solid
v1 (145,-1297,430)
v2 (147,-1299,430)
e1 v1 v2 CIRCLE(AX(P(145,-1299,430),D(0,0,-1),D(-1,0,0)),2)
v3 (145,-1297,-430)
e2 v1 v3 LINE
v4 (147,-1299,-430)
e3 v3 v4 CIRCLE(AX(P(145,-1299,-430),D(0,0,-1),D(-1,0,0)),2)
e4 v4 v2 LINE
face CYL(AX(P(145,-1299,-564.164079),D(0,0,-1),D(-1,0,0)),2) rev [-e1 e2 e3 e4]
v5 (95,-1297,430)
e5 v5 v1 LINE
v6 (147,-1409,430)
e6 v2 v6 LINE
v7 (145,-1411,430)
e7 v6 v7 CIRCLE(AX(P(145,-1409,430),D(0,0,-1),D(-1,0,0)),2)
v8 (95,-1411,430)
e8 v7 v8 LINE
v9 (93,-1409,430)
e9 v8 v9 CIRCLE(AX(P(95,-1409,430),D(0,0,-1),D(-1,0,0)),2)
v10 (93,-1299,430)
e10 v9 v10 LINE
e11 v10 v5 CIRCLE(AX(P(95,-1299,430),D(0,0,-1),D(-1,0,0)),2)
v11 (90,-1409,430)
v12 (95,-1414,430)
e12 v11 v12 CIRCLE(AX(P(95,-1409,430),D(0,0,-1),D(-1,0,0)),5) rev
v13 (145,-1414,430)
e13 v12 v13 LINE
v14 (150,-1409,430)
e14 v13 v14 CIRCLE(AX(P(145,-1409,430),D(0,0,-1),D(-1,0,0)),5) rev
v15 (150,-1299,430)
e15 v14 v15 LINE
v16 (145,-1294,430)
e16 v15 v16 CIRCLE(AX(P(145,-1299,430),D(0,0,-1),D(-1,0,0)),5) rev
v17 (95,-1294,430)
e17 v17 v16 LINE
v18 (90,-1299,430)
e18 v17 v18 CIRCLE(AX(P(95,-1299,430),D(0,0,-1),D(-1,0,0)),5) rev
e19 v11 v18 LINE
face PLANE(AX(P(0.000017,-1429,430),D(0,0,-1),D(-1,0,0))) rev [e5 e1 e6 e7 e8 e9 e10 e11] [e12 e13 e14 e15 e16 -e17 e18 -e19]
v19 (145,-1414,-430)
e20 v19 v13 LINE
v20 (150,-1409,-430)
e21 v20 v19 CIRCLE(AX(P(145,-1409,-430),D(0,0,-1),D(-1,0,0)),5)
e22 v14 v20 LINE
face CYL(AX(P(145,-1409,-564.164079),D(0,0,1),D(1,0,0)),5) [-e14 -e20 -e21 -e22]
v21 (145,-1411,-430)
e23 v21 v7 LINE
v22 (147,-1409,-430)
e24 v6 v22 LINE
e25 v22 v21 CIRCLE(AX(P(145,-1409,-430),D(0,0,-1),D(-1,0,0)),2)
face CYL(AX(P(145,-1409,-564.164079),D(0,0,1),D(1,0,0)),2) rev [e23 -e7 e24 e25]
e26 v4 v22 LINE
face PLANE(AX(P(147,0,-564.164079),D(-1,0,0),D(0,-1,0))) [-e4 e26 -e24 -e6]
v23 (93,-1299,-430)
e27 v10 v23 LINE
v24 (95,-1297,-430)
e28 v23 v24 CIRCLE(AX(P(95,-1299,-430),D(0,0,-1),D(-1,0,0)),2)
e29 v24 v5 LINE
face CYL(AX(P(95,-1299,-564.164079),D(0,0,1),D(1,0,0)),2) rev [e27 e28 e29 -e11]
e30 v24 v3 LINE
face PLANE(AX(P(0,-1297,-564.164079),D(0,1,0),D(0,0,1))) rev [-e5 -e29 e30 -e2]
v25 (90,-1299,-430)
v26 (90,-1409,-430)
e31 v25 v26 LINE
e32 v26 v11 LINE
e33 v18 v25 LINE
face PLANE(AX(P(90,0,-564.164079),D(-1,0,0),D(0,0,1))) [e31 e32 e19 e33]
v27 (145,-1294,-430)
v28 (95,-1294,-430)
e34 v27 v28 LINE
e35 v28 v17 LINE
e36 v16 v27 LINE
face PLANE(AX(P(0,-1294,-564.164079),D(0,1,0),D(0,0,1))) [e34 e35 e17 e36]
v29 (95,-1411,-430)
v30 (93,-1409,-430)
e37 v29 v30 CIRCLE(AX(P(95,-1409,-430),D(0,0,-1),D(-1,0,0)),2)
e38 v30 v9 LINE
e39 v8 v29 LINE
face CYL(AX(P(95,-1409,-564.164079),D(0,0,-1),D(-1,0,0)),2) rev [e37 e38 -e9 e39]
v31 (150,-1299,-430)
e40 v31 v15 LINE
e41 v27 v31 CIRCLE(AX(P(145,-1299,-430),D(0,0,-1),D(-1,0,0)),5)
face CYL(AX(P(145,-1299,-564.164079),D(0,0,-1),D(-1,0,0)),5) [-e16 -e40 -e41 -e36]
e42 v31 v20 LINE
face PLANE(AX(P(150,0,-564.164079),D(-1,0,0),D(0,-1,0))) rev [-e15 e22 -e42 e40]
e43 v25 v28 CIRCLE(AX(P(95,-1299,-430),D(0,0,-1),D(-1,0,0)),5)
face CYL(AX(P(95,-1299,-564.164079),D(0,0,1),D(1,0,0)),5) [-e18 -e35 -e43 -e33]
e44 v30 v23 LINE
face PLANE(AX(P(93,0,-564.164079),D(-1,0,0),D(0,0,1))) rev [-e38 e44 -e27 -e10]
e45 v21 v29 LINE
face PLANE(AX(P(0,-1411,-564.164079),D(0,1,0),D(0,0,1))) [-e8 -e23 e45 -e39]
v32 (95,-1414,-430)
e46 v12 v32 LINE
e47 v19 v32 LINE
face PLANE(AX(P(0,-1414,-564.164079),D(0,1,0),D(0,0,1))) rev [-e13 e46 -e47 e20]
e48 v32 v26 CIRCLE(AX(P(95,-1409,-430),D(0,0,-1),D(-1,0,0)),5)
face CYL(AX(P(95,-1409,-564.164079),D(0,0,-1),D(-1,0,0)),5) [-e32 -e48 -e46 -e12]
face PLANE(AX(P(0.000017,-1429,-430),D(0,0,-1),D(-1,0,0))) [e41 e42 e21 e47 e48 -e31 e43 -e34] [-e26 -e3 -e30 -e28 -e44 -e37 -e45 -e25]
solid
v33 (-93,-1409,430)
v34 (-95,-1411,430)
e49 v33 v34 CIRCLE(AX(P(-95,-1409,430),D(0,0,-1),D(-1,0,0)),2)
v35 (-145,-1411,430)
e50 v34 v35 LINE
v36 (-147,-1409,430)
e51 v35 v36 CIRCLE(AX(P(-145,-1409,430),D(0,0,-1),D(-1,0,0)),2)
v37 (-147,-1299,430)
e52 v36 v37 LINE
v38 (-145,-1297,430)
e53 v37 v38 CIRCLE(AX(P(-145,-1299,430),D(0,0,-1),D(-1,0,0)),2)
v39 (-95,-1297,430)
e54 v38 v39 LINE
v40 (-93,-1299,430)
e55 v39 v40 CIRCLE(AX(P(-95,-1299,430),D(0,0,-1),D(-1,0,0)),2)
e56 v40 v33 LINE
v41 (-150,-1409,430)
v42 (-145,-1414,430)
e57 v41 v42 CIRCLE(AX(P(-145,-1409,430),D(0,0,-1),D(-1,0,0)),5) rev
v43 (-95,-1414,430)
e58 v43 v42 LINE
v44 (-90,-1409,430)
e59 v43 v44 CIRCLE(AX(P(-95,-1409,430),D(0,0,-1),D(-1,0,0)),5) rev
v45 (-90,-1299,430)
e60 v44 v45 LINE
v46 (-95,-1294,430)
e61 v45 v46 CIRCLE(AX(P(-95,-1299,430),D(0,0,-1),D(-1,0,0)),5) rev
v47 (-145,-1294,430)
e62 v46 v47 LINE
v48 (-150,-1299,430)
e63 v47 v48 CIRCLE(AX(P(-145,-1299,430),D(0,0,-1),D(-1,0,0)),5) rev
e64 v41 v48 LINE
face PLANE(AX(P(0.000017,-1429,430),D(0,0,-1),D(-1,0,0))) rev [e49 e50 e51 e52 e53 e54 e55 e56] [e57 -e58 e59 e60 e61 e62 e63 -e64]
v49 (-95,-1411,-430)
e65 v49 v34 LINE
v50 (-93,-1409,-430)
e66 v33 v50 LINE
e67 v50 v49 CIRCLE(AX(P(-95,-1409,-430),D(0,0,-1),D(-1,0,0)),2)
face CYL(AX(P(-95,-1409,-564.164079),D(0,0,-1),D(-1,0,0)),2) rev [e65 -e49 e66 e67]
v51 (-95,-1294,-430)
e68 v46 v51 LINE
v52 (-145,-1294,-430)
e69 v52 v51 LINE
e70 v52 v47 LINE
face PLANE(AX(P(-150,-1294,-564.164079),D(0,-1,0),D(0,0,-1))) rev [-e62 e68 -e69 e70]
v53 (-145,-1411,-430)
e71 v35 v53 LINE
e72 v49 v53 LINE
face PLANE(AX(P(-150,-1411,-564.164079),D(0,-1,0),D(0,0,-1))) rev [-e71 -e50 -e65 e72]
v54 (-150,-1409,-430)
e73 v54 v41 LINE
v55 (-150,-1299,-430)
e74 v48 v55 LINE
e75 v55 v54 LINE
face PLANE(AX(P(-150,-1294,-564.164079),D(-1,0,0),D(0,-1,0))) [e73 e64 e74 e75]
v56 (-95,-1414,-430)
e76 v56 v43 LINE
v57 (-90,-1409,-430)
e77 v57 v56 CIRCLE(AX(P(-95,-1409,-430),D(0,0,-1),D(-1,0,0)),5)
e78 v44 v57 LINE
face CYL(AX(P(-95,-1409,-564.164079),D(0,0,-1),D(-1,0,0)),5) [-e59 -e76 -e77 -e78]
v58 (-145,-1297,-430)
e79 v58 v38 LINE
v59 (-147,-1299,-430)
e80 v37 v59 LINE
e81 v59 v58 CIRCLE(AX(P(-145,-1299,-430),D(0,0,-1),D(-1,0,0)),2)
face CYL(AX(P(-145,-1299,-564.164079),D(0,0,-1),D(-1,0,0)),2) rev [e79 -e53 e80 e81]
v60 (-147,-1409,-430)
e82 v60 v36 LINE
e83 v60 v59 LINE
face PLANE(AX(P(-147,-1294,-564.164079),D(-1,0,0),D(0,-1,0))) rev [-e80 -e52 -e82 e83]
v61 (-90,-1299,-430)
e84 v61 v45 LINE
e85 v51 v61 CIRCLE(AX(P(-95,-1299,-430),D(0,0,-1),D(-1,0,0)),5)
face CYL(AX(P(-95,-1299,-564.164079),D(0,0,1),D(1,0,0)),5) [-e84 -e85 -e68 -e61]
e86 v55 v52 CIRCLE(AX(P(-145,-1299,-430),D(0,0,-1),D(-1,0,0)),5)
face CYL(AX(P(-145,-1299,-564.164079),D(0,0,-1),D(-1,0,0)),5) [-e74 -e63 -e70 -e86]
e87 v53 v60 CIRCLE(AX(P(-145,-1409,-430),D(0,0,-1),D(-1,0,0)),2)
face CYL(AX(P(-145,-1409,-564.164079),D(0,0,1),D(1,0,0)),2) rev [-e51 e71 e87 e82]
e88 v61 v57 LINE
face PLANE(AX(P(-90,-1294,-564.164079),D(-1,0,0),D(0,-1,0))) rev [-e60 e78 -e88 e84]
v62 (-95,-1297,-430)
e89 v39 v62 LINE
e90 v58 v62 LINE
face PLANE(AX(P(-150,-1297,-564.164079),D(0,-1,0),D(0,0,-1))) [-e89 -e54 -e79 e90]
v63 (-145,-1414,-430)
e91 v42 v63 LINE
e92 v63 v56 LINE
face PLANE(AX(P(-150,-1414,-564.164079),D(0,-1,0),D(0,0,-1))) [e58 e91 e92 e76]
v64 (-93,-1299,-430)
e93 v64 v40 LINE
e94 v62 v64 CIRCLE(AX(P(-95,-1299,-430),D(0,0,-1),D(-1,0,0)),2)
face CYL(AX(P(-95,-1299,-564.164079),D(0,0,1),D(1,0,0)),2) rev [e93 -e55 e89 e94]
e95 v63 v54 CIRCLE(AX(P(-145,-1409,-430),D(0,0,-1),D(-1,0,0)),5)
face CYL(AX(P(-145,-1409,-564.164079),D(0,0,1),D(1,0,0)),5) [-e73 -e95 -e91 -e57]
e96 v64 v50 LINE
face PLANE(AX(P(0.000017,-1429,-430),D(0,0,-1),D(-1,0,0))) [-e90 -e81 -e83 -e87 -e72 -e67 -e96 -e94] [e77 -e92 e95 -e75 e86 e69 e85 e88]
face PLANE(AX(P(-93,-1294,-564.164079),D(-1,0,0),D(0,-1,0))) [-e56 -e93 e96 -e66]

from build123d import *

# Parameters (mm, degrees)
BOSS_EXTRUDE3_DEPTH        = 430
BOSS_EXTRUDE3_DEPTH_BACK   = 430
SKETCH1_W                  = 60
SKETCH1_H                  = 120
BOSS_EXTRUDE3_2_DEPTH      = 430
BOSS_EXTRUDE3_2_DEPTH_BACK = 430
FILLET1_R                  = 5
FILLET2_R                  = 5
SHELL4_START               = -427
SHELL4_DEPTH               = 854
SHELL5_START               = -427
SHELL5_DEPTH               = 854
CUT_EXTRUDE1_DEPTH         = 1662.774954679


# Read off the part's stored shape, not the designer's step: Shell4, Shell5
with BuildPart() as part:
    # Sketch1 → Boss-Extrude3 (new, two sides: drawn at the far end of the back side and taken through both)
    with BuildSketch(Plane.XY.offset(-BOSS_EXTRUDE3_DEPTH_BACK)):
        with Locations((120, -1354)):
            Rectangle(SKETCH1_W, SKETCH1_H)
    extrude(amount=BOSS_EXTRUDE3_DEPTH + BOSS_EXTRUDE3_DEPTH_BACK)

    # Fillet1
    fillet1_edges = [part.edges().sort_by_distance(p)[0] for p in [
        (150, -1294, 0),
        (90, -1294, 0),
        (90, -1414, 0),
        (150, -1414, 0),
    ]]
    fillet(fillet1_edges, radius=FILLET1_R)

    # Shell4 outline → Shell4 (cut)
    with BuildSketch(Plane.XY.offset(SHELL4_START)):
        with BuildLine():
            ThreePointArc((147, -1299), (146.414213562, -1297.585786438), (145, -1297))
            Line((145, -1297), (95, -1297))
            ThreePointArc((95, -1297), (93.585786438, -1297.585786438), (93, -1299))
            Line((93, -1299), (93, -1409))
            ThreePointArc((93, -1409), (93.585786438, -1410.414213562), (95, -1411))
            Line((95, -1411), (145, -1411))
            ThreePointArc((145, -1411), (146.414213562, -1410.414213562), (147, -1409))
            Line((147, -1409), (147, -1299))
        make_face()
    extrude(amount=SHELL4_DEPTH, mode=Mode.SUBTRACT)


with BuildPart() as body_2:
    # Sketch1 → Boss-Extrude3 2 (new, two sides: drawn at the far end of the back side and taken through both)
    with BuildSketch(Plane.XY.offset(-BOSS_EXTRUDE3_2_DEPTH_BACK)):
        with Locations((-120, -1354)):
            Rectangle(SKETCH1_W, SKETCH1_H)
    extrude(amount=BOSS_EXTRUDE3_2_DEPTH + BOSS_EXTRUDE3_2_DEPTH_BACK)

    # Fillet2
    fillet2_edges = [body_2.edges().sort_by_distance(p)[0] for p in [
        (-150, -1294, 0),
        (-150, -1414, 0),
        (-90, -1414, 0),
        (-90, -1294, 0),
    ]]
    fillet(fillet2_edges, radius=FILLET2_R)

    # Shell5 outline → Shell5 (cut)
    with BuildSketch(Plane.XY.offset(SHELL5_START)):
        with BuildLine():
            ThreePointArc((-145, -1297), (-146.414213562, -1297.585786438), (-147, -1299))
            Line((-147, -1299), (-147, -1409))
            ThreePointArc((-147, -1409), (-146.414213562, -1410.414213562), (-145, -1411))
            Line((-145, -1411), (-95, -1411))
            ThreePointArc((-95, -1411), (-93.585786438, -1410.414213562), (-93, -1409))
            Line((-93, -1409), (-93, -1299))
            ThreePointArc((-93, -1299), (-93.585786438, -1297.585786438), (-95, -1297))
            Line((-95, -1297), (-145, -1297))
        make_face()
    extrude(amount=SHELL5_DEPTH, mode=Mode.SUBTRACT)


with BuildPart() as cut_extrude1_tool:
    # Sketch2 → Cut-Extrude1 (new, through all)
    with BuildSketch(Plane(origin=(0, 0, -430), x_dir=(-1, 0, 0), z_dir=(0, 0, -1))):
        with BuildLine():
            Line((-145, -1411), (-95, -1411))
            ThreePointArc((-95, -1411), (-93.585786438, -1410.414213562), (-93, -1409))
            Line((-93, -1409), (-93, -1299))
            ThreePointArc((-93, -1299), (-93.585786438, -1297.585786438), (-95, -1297))
            Line((-95, -1297), (-145, -1297))
            ThreePointArc((-145, -1297), (-146.414213562, -1297.585786438), (-147, -1299))
            Line((-147, -1299), (-147, -1409))
            ThreePointArc((-147, -1409), (-146.414213562, -1410.414213562), (-145, -1411))
        make_face()
        with BuildLine():
            Line((95, -1411), (145, -1411))
            ThreePointArc((145, -1411), (146.414213562, -1410.414213562), (147, -1409))
            Line((147, -1409), (147, -1299))
            ThreePointArc((147, -1299), (146.414213562, -1297.585786438), (145, -1297))
            Line((145, -1297), (95, -1297))
            ThreePointArc((95, -1297), (93.585786438, -1297.585786438), (93, -1299))
            Line((93, -1299), (93, -1409))
            ThreePointArc((93, -1409), (93.585786438, -1410.414213562), (95, -1411))
        make_face()
    extrude(amount=-CUT_EXTRUDE1_DEPTH)


with BuildPart() as part_1:
    add(part.part)

    # Cut-Extrude1: cut by cut_extrude1_tool
    add(cut_extrude1_tool.part, mode=Mode.SUBTRACT)


with BuildPart() as body_2_1:
    add(body_2.part)

    # Cut-Extrude1: cut by cut_extrude1_tool
    add(cut_extrude1_tool.part, mode=Mode.SUBTRACT)


solid = Compound([part_1.part, body_2_1.part])
